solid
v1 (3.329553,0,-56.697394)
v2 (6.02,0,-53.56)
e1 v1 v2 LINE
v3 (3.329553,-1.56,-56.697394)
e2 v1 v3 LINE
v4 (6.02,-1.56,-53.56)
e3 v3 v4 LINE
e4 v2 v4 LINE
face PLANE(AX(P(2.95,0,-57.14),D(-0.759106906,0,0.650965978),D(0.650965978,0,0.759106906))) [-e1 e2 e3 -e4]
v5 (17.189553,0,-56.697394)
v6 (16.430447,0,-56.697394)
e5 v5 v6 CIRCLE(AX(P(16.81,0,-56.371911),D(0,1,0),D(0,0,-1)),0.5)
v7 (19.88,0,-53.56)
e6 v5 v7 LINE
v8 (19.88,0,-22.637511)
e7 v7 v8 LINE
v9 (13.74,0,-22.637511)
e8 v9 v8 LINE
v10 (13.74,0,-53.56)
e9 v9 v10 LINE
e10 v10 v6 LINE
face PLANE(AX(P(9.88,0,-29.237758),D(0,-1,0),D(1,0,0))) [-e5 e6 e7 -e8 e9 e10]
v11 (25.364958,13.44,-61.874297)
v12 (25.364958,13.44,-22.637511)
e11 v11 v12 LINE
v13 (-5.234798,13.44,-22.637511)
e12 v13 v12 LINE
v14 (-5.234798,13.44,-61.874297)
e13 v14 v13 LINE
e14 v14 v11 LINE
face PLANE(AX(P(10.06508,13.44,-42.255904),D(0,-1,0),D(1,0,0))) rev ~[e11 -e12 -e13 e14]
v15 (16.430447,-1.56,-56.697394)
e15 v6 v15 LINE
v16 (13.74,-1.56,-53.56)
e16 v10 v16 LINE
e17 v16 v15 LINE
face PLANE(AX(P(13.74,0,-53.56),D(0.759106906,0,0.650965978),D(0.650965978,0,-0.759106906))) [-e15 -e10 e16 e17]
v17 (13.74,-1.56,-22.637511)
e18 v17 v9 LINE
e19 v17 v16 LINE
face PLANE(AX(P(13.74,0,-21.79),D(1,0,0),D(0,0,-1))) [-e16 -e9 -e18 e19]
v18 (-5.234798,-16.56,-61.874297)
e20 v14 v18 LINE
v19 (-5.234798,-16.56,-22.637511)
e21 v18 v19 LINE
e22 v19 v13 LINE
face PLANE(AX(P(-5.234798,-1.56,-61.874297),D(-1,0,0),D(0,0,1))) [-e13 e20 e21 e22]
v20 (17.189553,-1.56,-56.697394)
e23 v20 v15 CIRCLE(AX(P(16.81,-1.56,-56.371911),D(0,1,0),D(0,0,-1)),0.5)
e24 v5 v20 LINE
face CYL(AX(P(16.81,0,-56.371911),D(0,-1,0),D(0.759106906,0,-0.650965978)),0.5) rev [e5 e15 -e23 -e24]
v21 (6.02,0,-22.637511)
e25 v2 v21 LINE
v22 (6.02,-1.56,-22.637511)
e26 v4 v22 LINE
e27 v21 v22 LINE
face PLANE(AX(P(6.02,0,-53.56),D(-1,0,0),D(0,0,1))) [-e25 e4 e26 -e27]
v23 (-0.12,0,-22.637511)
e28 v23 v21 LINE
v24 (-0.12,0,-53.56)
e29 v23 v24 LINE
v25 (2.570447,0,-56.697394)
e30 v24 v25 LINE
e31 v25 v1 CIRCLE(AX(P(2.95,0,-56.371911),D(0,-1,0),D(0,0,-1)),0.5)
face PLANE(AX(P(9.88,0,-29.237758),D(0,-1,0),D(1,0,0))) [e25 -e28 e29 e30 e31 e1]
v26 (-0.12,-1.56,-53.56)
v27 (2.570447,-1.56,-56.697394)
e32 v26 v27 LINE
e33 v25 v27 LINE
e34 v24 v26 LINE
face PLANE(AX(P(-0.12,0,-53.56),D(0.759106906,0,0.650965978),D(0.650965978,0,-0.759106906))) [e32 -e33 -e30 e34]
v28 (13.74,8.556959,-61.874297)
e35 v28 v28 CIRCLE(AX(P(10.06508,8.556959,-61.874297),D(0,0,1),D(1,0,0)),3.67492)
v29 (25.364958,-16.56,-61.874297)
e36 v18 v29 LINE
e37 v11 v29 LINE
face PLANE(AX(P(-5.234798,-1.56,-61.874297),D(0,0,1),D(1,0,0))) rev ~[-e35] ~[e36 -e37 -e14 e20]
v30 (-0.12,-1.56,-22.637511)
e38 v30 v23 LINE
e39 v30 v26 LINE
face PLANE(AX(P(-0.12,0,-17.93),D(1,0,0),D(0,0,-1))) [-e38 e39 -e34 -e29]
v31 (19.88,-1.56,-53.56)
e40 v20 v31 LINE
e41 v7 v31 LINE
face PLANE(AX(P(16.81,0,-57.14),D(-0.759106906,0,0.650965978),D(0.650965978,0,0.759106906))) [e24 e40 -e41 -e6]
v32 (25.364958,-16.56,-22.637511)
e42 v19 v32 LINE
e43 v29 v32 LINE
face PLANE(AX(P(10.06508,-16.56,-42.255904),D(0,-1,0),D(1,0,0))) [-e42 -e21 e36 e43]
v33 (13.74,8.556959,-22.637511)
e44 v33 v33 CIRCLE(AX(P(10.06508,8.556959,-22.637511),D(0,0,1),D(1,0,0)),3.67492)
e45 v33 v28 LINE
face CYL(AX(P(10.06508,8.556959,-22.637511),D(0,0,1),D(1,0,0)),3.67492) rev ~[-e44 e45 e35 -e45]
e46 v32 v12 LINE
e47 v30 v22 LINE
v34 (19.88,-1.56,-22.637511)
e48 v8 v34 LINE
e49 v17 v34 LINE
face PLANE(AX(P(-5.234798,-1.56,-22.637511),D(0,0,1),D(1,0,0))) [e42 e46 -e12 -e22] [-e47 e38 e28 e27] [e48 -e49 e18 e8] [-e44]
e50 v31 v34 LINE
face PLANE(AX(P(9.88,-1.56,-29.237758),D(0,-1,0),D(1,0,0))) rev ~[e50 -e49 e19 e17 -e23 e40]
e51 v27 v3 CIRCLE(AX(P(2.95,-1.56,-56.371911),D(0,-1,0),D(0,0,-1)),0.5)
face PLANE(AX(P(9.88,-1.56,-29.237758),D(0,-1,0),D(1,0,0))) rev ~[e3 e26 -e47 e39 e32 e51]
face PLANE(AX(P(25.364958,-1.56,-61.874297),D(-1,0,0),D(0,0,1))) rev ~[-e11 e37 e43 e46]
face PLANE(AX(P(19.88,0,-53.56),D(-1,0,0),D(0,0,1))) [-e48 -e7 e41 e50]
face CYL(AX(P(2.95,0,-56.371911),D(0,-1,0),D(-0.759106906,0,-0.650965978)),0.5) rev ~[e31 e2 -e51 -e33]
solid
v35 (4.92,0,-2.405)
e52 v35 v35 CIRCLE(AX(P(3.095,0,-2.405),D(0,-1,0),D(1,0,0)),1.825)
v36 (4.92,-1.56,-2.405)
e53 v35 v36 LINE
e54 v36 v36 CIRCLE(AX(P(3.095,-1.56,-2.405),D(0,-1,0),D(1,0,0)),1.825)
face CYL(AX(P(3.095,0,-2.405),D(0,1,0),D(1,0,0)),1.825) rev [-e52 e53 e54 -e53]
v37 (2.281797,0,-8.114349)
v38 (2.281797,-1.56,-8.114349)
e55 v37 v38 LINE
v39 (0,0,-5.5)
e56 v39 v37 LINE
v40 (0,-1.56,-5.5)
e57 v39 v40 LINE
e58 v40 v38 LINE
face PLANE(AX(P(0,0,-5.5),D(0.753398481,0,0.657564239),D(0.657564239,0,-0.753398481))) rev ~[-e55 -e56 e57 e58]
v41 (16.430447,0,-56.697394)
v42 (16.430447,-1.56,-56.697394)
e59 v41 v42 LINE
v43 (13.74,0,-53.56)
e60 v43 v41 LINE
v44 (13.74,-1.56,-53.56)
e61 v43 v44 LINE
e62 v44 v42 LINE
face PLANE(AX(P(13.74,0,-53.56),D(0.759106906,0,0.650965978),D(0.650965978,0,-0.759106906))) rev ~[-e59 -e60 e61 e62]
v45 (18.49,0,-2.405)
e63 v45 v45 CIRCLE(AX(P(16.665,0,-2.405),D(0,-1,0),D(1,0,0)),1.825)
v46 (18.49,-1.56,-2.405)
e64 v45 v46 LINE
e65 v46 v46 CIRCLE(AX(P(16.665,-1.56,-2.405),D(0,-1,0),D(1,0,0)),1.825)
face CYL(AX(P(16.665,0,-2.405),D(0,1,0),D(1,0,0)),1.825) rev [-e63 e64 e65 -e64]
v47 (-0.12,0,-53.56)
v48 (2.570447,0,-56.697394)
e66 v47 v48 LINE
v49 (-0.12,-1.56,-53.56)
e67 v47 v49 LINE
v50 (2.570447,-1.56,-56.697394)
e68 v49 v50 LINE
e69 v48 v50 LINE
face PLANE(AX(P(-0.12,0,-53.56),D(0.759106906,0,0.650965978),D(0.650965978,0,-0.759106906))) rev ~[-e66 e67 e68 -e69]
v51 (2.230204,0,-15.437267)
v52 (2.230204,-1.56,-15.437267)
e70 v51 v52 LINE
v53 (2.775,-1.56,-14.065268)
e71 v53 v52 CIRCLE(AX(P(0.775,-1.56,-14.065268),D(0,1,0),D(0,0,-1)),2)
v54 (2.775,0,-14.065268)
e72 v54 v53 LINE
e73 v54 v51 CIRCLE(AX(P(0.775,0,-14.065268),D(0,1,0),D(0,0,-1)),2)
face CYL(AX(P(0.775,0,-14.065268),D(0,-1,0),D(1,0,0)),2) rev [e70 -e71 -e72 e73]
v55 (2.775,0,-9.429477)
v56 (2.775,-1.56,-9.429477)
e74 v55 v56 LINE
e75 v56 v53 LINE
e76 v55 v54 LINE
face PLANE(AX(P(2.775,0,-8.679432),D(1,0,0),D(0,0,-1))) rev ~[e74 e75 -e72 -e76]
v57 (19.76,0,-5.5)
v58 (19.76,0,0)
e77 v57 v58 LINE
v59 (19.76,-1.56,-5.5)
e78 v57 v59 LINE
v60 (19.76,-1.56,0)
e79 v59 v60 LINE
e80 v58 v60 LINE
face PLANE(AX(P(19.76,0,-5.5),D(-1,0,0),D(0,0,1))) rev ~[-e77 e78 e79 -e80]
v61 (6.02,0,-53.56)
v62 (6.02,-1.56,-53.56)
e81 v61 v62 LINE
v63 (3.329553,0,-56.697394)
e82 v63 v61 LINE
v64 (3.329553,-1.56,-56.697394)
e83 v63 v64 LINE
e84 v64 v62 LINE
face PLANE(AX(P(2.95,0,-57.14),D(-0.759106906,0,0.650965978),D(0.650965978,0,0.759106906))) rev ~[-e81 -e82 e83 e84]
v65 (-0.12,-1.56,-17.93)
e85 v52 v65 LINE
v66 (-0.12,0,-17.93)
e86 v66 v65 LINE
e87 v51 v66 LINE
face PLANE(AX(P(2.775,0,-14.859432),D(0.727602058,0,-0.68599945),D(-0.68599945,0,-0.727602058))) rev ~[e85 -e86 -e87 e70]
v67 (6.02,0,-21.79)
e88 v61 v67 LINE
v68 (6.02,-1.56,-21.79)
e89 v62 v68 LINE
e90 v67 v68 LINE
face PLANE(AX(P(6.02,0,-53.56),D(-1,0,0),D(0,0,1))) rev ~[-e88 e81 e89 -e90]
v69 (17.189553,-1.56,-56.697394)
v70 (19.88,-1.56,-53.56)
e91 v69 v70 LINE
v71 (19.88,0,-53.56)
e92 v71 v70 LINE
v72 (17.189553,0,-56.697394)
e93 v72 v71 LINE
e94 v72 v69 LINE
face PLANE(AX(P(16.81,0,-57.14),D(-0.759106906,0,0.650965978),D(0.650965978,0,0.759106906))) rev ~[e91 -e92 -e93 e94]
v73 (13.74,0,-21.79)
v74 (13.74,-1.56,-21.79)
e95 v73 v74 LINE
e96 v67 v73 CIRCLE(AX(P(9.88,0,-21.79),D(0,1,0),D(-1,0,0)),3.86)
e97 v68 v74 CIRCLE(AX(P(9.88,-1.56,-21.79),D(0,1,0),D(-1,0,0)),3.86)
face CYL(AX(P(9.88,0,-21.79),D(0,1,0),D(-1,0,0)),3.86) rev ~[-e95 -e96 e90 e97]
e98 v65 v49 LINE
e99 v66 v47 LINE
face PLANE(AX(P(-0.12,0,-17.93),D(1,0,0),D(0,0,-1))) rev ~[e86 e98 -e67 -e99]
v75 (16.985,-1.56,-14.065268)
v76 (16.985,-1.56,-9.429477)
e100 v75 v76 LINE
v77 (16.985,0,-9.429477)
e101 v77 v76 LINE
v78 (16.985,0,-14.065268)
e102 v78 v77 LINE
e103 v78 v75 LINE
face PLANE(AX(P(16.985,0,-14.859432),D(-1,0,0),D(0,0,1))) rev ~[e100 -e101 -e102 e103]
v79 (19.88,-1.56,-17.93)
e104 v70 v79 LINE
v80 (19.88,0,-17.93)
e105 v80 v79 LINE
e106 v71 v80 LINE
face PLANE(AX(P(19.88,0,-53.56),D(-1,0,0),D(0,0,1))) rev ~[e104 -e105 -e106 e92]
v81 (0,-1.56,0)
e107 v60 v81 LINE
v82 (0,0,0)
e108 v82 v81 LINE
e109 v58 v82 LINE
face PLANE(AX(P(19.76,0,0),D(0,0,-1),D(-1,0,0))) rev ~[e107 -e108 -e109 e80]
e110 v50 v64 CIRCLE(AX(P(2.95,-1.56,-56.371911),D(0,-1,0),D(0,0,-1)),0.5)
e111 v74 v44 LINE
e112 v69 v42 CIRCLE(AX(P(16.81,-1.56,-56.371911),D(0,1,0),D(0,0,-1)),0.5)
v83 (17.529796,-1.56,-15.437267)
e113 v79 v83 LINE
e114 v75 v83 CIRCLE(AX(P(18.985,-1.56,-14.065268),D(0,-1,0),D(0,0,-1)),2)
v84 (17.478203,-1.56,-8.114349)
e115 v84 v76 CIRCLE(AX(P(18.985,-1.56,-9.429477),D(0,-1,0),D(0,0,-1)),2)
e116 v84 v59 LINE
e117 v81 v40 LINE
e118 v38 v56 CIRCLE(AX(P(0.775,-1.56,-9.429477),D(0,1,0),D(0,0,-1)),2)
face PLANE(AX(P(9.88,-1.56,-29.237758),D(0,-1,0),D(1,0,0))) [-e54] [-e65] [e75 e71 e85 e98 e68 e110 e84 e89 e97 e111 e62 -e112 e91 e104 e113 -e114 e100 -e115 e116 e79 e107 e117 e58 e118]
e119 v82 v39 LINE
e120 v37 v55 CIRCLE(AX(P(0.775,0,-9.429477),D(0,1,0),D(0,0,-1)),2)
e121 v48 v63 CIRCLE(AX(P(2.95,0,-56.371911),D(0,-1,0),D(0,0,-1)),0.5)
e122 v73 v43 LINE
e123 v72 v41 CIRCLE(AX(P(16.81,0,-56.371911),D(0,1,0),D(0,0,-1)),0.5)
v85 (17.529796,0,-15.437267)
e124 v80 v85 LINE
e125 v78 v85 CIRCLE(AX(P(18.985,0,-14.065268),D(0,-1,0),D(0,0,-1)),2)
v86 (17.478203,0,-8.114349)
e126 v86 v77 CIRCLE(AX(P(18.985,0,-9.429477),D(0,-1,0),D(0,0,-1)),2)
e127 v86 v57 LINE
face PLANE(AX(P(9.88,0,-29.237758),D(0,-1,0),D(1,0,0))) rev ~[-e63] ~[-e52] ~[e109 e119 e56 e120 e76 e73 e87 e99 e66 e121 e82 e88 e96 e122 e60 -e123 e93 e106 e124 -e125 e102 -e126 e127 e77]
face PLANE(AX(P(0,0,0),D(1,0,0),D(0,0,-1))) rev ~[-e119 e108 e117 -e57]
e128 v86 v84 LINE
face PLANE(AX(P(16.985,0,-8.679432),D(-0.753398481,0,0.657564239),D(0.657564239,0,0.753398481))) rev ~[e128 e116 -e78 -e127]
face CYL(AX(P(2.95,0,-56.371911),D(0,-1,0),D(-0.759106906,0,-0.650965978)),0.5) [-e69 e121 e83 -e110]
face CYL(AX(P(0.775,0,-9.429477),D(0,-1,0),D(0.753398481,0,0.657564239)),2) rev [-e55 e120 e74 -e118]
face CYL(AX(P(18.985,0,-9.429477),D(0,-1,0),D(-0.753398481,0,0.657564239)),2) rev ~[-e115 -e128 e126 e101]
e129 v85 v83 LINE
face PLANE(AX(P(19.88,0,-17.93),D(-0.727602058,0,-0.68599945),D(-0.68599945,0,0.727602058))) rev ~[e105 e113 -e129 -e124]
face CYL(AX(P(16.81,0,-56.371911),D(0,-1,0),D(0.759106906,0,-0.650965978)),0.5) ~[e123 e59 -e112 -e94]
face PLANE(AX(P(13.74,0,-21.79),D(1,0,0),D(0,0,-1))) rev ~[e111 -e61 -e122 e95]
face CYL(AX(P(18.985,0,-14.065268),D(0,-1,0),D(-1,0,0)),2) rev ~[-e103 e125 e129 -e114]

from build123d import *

# Parameters (mm, degrees)
F0_R          = 1.825
F1_DEPTH      = 1.56
F2_R          = 2
F3_R          = 0.5
F4_W          = 30.5997557007
F4_H          = 39.236785844
F5_DEPTH      = 15
F5_DEPTH_BACK = 15
F7_R          = 3.6749201005
F8_DEPTH      = 54.4


with BuildPart() as f1:
    # F0 (on Front) → F1 (new body)
    with BuildSketch(Plane.XZ):
        with BuildLine():
            Line((19.76, 0), (0, 0))
            Line((0, 0), (0, -5.5))
            Line((0, -5.5), (2.775, -8.679432))
            Line((2.775, -8.679432), (2.775, -14.859432))
            Line((2.775, -14.859432), (-0.12, -17.93))
            Line((-0.12, -17.93), (-0.12, -53.56))
            Line((-0.12, -53.56), (2.95, -57.14))
            Line((2.95, -57.14), (6.02, -53.56))
            Line((6.02, -53.56), (6.02, -21.79))
            ThreePointArc((6.02, -21.79), (9.88, -17.93), (13.74, -21.79))
            Line((13.74, -21.79), (13.74, -53.56))
            Line((13.74, -53.56), (16.81, -57.14))
            Line((16.81, -57.14), (19.88, -53.56))
            Line((19.88, -53.56), (19.88, -17.93))
            Line((19.88, -17.93), (16.985, -14.859432))
            Line((16.985, -14.859432), (16.985, -8.679432))
            Line((16.985, -8.679432), (19.76, -5.5))
            Line((19.76, -5.5), (19.76, 0))
        make_face()
        with Locations((3.095, -2.405)):
            Circle(F0_R, mode=Mode.SUBTRACT)
        with Locations((16.665, -2.405)):
            Circle(F0_R, mode=Mode.SUBTRACT)
    extrude(amount=F1_DEPTH)

    # F2
    f2_edges = [f1.edges().sort_by_distance(p)[0] for p in [
        (2.775, -0.78, -8.679432),
        (2.775, -0.78, -14.859432),
        (16.985, -0.78, -8.679432),
        (16.985, -0.78, -14.859432),
    ]]
    fillet(f2_edges, radius=F2_R)

    # F3
    f3_edges = [f1.edges().sort_by_distance(p)[0] for p in [
        (2.95, -0.78, -57.14),
        (16.81, -0.78, -57.14),
    ]]
    fillet(f3_edges, radius=F3_R)


with BuildPart() as f5:
    # F4 (on face) → F5 (new body, two sides)
    with BuildSketch(Plane.XZ.offset(1.56)) as f5_sk:
        with Locations((10.0650798995, -42.2559035942)):
            Rectangle(F4_W, F4_H)
    extrude(amount=-F5_DEPTH)
    extrude(f5_sk.sketch, amount=F5_DEPTH_BACK)

    # F6: cut F1
    add(f1.part, mode=Mode.SUBTRACT)

    # F7 (on face) → F8 (cut)
    with BuildSketch(Plane.XY.offset(-22.6375106722)):
        with Locations((10.0650798995, 8.5569592193)):
            Circle(F7_R)
    extrude(amount=-F8_DEPTH, mode=Mode.SUBTRACT)


solid = Compound([f1.part, f5.part])
